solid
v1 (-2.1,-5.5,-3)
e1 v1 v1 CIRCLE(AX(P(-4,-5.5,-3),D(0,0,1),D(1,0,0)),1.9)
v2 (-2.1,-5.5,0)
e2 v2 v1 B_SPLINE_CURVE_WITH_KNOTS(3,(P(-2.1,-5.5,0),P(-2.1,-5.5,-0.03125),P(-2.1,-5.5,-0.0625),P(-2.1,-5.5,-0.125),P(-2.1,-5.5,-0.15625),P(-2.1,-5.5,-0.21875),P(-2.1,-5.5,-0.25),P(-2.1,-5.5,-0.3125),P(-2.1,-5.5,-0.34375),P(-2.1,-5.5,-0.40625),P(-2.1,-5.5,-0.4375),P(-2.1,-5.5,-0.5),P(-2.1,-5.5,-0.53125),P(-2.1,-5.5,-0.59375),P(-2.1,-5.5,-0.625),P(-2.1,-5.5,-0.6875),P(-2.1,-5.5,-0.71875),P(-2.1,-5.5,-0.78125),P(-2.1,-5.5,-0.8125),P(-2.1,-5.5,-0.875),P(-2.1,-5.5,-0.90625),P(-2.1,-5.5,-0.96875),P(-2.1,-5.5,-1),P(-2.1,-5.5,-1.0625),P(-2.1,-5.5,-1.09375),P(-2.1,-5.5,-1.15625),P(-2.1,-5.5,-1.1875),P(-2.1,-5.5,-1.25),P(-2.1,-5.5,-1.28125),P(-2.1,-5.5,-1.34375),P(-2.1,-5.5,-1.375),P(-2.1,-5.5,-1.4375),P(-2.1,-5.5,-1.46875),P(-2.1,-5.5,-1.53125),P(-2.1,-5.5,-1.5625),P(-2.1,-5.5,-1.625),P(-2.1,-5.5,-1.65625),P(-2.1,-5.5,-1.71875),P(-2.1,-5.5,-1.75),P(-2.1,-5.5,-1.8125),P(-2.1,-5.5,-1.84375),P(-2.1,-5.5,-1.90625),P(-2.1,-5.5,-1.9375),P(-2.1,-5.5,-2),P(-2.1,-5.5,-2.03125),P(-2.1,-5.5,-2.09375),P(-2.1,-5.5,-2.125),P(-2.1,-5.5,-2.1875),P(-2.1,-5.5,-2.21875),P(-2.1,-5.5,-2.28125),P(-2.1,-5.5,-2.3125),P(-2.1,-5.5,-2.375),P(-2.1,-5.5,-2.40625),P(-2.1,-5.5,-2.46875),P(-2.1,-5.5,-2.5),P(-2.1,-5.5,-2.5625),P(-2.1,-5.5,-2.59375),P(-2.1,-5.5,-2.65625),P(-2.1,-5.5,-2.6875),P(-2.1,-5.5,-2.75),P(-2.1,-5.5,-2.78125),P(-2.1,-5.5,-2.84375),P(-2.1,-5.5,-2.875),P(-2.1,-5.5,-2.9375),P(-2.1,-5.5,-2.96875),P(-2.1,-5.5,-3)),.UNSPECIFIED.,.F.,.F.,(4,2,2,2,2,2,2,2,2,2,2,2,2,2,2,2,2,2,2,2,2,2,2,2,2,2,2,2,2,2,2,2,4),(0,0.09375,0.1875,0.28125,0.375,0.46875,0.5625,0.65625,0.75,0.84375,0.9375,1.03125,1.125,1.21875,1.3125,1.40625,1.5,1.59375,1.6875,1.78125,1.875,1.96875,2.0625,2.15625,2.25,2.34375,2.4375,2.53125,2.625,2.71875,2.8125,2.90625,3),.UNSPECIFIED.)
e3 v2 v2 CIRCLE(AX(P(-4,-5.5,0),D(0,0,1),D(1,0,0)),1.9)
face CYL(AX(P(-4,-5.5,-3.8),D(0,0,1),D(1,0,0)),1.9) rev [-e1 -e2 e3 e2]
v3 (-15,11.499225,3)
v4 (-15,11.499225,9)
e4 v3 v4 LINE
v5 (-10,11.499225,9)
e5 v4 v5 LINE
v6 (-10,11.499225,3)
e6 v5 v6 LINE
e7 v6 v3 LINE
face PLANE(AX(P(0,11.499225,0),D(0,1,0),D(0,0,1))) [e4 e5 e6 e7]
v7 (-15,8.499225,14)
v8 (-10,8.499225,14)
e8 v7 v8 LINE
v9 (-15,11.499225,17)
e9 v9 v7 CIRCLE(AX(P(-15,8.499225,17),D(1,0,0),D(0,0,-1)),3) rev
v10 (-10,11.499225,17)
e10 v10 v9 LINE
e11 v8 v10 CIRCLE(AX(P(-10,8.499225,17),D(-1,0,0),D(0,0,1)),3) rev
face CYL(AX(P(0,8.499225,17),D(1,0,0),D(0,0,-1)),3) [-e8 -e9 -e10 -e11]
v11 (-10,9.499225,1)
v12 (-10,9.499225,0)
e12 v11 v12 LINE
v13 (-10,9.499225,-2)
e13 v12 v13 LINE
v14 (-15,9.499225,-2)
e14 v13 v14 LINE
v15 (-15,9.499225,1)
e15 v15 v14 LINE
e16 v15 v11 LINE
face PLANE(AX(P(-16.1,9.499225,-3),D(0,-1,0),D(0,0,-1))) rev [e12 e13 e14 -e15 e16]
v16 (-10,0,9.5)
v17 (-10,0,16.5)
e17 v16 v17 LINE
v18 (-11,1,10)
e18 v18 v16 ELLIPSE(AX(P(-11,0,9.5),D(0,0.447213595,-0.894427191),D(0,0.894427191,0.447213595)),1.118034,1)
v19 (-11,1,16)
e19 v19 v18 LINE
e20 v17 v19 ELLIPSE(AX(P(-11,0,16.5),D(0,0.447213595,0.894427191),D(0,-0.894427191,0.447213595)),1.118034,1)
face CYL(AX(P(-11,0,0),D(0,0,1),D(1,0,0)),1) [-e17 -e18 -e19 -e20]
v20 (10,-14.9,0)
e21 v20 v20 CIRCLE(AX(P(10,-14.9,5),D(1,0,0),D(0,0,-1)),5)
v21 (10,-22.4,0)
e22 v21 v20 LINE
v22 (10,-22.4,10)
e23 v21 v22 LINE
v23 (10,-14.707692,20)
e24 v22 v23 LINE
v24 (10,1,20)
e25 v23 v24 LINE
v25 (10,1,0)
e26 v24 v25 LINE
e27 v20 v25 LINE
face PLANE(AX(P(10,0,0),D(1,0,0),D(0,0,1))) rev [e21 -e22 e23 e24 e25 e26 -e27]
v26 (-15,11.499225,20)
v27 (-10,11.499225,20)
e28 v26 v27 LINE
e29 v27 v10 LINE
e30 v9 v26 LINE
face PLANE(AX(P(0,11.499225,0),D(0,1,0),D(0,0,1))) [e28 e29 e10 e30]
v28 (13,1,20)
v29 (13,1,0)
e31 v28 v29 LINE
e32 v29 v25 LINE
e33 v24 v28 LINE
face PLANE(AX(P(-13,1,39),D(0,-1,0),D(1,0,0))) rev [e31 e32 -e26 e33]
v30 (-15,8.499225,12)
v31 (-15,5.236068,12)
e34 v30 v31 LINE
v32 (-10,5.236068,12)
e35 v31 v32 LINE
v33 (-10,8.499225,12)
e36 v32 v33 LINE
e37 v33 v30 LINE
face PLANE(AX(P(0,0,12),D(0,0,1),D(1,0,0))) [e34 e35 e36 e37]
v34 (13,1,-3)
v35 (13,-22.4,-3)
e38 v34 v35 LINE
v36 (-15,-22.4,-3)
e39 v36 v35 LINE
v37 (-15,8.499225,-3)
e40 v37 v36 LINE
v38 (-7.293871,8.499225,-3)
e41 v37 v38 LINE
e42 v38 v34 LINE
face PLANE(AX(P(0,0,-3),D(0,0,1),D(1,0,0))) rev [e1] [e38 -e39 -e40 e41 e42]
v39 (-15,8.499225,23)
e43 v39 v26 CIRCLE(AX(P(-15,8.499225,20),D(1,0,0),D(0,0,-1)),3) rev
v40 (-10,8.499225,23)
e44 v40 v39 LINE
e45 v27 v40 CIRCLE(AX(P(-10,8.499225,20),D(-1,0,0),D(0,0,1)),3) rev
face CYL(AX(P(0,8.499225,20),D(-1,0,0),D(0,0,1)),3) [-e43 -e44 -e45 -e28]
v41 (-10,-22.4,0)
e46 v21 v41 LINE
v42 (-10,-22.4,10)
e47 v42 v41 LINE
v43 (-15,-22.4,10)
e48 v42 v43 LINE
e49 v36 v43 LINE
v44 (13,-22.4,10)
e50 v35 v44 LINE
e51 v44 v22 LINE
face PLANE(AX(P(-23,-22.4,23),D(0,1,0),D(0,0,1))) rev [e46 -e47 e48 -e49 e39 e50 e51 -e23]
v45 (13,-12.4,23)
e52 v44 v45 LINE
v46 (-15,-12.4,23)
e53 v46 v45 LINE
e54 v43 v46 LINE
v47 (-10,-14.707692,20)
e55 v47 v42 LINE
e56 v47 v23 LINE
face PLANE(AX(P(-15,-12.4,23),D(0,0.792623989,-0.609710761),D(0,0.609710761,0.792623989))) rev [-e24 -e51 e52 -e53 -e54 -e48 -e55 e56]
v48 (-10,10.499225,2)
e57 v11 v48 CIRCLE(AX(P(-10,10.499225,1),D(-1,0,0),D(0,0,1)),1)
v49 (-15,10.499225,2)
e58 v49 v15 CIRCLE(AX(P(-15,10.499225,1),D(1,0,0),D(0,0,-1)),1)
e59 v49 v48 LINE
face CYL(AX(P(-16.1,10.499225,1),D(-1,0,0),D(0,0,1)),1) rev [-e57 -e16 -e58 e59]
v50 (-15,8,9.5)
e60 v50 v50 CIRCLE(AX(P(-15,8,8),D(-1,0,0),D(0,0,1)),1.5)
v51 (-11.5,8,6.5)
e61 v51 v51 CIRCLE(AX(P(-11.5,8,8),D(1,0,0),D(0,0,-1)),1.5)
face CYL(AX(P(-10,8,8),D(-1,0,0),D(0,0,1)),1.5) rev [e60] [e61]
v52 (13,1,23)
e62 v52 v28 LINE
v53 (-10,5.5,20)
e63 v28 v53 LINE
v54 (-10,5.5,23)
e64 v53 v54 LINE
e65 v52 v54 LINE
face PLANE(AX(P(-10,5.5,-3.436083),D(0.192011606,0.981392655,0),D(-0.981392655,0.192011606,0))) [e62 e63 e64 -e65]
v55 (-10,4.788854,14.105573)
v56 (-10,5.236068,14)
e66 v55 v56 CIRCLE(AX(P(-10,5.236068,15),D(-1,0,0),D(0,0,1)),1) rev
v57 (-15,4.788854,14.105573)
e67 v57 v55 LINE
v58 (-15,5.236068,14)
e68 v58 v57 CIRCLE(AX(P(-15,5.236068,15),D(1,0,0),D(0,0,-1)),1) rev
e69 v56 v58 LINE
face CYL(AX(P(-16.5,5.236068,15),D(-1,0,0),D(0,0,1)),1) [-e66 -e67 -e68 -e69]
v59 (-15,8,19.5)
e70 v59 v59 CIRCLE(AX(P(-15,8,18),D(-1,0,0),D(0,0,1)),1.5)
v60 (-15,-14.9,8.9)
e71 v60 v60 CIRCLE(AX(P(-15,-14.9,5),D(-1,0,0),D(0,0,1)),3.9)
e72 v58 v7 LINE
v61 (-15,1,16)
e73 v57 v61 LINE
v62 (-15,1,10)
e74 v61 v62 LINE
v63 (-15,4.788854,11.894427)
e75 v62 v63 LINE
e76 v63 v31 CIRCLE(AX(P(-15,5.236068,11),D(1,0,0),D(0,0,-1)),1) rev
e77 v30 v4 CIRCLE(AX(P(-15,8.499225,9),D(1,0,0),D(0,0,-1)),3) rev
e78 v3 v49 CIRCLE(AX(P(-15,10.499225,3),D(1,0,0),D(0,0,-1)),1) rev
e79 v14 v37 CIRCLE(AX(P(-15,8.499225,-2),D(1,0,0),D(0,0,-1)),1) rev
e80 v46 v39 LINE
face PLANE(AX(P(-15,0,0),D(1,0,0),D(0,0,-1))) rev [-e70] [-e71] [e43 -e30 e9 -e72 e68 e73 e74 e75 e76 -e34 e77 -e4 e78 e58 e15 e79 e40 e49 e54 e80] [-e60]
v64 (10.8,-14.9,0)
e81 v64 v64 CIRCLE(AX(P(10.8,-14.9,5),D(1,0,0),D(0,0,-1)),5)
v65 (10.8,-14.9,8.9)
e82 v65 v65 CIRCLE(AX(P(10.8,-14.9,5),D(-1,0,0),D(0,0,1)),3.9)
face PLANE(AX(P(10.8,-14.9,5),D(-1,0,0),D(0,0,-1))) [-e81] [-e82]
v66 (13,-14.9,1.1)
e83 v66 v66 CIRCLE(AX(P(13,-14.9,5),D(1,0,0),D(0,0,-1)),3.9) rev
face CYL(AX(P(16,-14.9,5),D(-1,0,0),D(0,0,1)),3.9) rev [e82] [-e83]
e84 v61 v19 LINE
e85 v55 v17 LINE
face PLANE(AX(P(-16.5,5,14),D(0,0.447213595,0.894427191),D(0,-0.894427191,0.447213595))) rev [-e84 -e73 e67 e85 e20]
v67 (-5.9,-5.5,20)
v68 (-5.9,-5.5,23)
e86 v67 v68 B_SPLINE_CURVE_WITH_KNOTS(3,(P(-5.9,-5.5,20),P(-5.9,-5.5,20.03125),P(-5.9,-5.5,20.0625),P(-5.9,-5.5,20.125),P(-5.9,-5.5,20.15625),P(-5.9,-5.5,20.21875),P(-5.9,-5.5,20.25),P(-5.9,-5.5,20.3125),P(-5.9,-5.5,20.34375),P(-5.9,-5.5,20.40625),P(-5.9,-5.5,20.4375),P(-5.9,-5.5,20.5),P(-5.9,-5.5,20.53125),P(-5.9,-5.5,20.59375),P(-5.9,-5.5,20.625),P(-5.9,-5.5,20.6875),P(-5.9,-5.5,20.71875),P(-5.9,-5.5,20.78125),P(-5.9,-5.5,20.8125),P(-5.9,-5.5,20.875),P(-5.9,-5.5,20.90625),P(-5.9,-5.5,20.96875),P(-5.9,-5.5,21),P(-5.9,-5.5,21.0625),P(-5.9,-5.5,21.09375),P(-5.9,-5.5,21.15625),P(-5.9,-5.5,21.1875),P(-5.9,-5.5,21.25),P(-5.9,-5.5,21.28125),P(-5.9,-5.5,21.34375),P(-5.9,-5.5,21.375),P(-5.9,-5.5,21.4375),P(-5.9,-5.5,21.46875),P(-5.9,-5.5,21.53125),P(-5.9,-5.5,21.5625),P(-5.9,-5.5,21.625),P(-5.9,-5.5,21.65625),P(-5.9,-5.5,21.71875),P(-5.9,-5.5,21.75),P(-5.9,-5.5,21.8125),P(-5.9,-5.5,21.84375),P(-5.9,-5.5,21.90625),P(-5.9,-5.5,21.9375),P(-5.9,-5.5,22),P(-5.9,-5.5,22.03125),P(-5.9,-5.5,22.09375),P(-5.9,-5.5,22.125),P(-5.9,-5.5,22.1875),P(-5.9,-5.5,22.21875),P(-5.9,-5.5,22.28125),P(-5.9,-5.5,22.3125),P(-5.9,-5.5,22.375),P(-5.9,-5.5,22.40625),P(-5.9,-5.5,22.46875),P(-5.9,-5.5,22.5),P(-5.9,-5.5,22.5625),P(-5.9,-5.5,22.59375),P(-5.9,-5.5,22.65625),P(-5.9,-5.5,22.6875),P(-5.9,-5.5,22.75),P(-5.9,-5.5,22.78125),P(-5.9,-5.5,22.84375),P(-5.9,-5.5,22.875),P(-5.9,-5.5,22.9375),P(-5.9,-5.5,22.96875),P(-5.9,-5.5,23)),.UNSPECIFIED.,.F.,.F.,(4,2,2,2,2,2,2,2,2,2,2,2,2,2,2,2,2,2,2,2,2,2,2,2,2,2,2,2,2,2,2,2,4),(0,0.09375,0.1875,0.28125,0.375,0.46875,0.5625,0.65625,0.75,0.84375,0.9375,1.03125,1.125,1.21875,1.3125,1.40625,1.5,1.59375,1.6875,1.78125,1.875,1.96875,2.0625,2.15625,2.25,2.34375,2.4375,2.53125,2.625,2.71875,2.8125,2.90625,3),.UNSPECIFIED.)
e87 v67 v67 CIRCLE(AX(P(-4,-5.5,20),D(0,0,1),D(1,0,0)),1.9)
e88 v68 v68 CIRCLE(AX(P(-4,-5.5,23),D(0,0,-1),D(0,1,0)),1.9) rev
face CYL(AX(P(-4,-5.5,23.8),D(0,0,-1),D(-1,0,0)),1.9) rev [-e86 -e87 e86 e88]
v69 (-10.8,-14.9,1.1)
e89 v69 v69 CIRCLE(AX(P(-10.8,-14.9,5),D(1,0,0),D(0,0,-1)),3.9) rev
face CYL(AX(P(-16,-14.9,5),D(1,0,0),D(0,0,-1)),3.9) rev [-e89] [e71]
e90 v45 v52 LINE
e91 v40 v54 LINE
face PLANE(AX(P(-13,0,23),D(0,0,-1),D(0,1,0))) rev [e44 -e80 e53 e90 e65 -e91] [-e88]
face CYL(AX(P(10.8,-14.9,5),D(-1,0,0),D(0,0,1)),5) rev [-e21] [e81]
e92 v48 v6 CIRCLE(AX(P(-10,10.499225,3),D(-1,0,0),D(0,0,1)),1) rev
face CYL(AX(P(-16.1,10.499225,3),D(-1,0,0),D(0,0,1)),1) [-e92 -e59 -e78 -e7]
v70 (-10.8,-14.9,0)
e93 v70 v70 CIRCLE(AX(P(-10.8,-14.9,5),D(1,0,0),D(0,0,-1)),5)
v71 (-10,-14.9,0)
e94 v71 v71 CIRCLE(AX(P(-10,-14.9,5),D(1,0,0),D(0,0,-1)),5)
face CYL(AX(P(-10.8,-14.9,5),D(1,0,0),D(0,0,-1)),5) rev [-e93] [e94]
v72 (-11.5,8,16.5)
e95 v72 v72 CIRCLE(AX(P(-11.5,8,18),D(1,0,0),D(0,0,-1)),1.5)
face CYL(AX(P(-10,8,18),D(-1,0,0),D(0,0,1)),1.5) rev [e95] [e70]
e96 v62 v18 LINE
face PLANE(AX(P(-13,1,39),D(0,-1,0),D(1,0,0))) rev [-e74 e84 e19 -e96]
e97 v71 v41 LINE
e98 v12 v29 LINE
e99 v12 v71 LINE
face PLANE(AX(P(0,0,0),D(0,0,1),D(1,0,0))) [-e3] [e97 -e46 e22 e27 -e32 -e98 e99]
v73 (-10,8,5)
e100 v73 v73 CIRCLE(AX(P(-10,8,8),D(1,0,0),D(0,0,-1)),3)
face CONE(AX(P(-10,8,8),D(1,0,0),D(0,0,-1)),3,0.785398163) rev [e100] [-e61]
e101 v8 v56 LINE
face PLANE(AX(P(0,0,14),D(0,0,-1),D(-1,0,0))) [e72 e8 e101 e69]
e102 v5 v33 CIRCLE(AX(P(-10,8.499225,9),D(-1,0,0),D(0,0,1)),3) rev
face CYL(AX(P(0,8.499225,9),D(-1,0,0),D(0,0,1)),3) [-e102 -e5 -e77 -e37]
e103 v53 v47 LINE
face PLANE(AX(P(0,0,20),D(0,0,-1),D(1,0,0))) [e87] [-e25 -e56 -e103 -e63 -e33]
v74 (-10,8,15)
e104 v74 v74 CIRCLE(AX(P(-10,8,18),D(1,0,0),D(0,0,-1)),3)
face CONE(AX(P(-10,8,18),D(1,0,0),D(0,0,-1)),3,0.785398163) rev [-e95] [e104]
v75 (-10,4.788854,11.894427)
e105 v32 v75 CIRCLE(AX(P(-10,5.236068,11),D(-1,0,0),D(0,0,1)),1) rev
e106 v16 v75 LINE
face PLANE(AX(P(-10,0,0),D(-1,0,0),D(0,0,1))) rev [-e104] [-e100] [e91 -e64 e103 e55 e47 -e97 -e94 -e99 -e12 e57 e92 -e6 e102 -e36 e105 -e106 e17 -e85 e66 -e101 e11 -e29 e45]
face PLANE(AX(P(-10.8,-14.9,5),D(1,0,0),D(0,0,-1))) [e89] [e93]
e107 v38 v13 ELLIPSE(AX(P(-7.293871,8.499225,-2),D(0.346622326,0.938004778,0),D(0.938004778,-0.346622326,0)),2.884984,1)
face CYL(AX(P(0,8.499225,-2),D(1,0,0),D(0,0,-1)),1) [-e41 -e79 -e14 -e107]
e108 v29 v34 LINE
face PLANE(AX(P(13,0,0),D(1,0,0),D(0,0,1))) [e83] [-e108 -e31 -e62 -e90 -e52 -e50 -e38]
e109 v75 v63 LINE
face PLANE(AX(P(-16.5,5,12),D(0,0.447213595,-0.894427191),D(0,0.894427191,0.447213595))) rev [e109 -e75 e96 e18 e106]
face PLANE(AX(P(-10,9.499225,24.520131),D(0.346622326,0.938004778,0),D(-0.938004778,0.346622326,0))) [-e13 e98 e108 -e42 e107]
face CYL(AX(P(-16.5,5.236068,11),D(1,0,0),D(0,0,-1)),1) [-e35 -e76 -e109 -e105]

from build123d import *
from build123d.topology import SkipClean

# Parameters (mm, degrees)
SKETCH_1_W                = 20
SKETCH_1_H                = 57.76596942167697
EXTRUDE_1_DEPTH           = 3
EXTRUDE_2_DEPTH           = 3
CUT_EXTRUDE_1_DEPTH       = 6
SKETCH_8_R                = 4.48
CUT_EXTRUDE_2_DEPTH       = 0.8
SKETCH_9_R                = 1.9
CUT_EXTRUDE_3_DEPTH       = 3.8
SKETCH_12_W               = 26.000000000000007
SKETCH_12_H               = 35.36596942167698
CUT_EXTRUDE_4_DEPTH       = 36.00000000000001
CUT_EXTRUDE_8_DEPTH       = 28.00000000000001
SKETCH_23_W               = 26.000000000000004
SKETCH_23_H               = 26
SKETCH_23_W_2             = 20
SKETCH_23_H_2             = 19.999999999999993
EXTRUDE_7_DEPTH           = 4
SKETCH_24_W               = 20
SKETCH_24_H               = 19.999999999999993
EXTRUDE_8_DEPTH           = 3
SKETCH_25_W               = 5.000000000000002
SKETCH_25_H               = 16
SKETCH_25_R               = 1.4999999999999991
EXTRUDE_9_DEPTH           = 3
FILLET_1_R                = 1
CUT_EXTRUDE_9_DEPTH       = 3
SKETCH_27_R               = 1.4999999999999987
CUT_EXTRUDE_10_DEPTH      = 3
SKETCH_28_W               = 20
SKETCH_28_H               = 19.999999999999993
CUT_EXTRUDE_11_DEPTH      = 10
CUT_EXTRUDE_12_DEPTH      = 42.00000000000001
SKETCH_31_R               = 4.48
SKETCH_31_R_2             = 3.98
EXTRUDE_13_DEPTH          = 0.8
SKETCH_32_R               = 5.000000000000001
SKETCH_32_R_2             = 3.98
CUT_EXTRUDE_13_DEPTH      = 0.8
SKETCH_33_R               = 4.48
EXTRUDE_14_DEPTH          = 3
SKETCH_36_R               = 5.000000000000001
CUT_EXTRUDE_14_DEPTH      = 3
SKETCH_37_R               = 3.98
SKETCH_37_R_2             = 3.900000000000001
EXTRUDE_17_DEPTH          = 0.8
SKETCH_38_R               = 1.5000000000000009
EXTRUDE_18_DEPTH          = 3
SKETCH_39_W               = 4.187599959799879
SKETCH_39_H               = 1.3608825238343043
EXTRUDE_19_DEPTH          = 3
EXTRUDE_START             = 2
SKETCH_43_R               = 1.5000000000000024
SKETCH_43_R_2             = 1.5000000000000009
SKETCH_43_R_3             = 3.900000000000002
EXTRUDE_22_DEPTH          = 2
SKETCH_44_W               = 5
SKETCH_44_H               = 9.399224841629362
EXTRUDE_23_DEPTH          = 2
EXTRUDE_24_DEPTH          = 3
SKETCH_47_W               = 5
SKETCH_47_H               = 9.399224841629362
EXTRUDE_25_DEPTH          = 8
SKETCH_51_W               = 5
SKETCH_51_H               = 14
SKETCH_51_H_2             = 7.999999999999998
EXTRUDE_28_DEPTH          = 1.1
CUT_EXTRUDE_16_DEPTH      = 6.1000000000000005
FILLET_START              = -16
FILLET_9_DEPTH            = 7
FILLET_START_2            = -15
FILLET_9_2_DEPTH          = 5
EXTRUDE_30_DEPTH          = 3
FILLET_10_R               = 1
SKETCH_57_W               = 5
SKETCH_57_H               = 10.499224841629362
EXTRUDE_31_DEPTH          = 1
SKETCH_58_W               = 5
SKETCH_58_H               = 10.499224841629362
EXTRUDE_32_DEPTH          = 1
FILLET_11_R               = 3
CUT_EXTRUDE_19_DEPTH      = 6.500000000000001
FILLET_14_R               = 1
FILLET_19_R               = 1
HOLE_WIZARD_1_D           = 3
HOLE_WIZARD_1_DEPTH       = 5
HOLE_WIZARD_1_CSINK_D     = 6
HOLE_WIZARD_1_CSINK_ANGLE = 90


with BuildPart() as part:
    # 草图1 → 凸台-拉伸1 (new body)
    with BuildSketch(Plane.XY):
        with Locations((0, -28.882984710838485)):
            Rectangle(SKETCH_1_W, SKETCH_1_H)
    extrude_1 = extrude(amount=-EXTRUDE_1_DEPTH)

    # 草图2 → 凸台-拉伸2 (add)
    with BuildSketch(Plane.ZY.offset(10)):
        Polygon((-3, -1.22e-15), (23, 0), (23.000000000000007, -57.76596942167697), (-3, -57.76596942167697), align=None)
    extrude_2 = extrude(amount=EXTRUDE_2_DEPTH)

    # 草图7 → 切除-拉伸1 (cut)
    with BuildSketch(Plane(origin=(-10, 0, 0), x_dir=(0, 0, -1), z_dir=(1, 0, 0))):
        with BuildLine():
            ThreePointArc((-1.0999999999999996, -14.899999999999997), (-5, -10.999999999999996), (-8.9, -14.899999999999997))
            Line((-8.9, -14.899999999999997), (-1.1000000000000014, -14.899999999999997))
        make_face()
        with BuildLine():
            Line((-1.1000000000000014, -14.899999999999997), (-8.9, -14.899999999999997))
            ThreePointArc((-8.9, -14.899999999999997), (-5.000000000000001, -18.799999999999997), (-1.0999999999999996, -14.899999999999999))
        make_face()
    cut_extrude_1 = extrude(amount=-CUT_EXTRUDE_1_DEPTH, mode=Mode.SUBTRACT)

    # 草图8 → 切除-拉伸2 (cut)
    with BuildSketch(Plane.ZY.offset(13.000000000000002)):
        with Locations((5, -14.899999999999997)):
            Circle(SKETCH_8_R)
    cut_extrude_2 = extrude(amount=-CUT_EXTRUDE_2_DEPTH, mode=Mode.SUBTRACT)

    # 草图9 → 切除-拉伸3 (cut)
    with BuildSketch(Plane.XY):
        with Locations((-4, -5.499999999999998)):
            Circle(SKETCH_9_R)
    cut_extrude_3 = extrude(amount=-CUT_EXTRUDE_3_DEPTH, mode=Mode.SUBTRACT)

    # 镜向1: 凸台-拉伸2 across plane
    add(extrude_2.mirror(Plane(origin=(0, 0, 0), x_dir=(0, 0, 1), z_dir=(1, 0, 0))))

    # 镜向2: 切除-拉伸1, 切除-拉伸2 across plane
    add(cut_extrude_1.mirror(Plane(origin=(0, 0, 0), x_dir=(0, 0, 1), z_dir=(1, 0, 0))), mode=Mode.SUBTRACT)
    add(cut_extrude_2.mirror(Plane(origin=(0, 0, 0), x_dir=(0, 0, 1), z_dir=(1, 0, 0))), mode=Mode.SUBTRACT)

    # 镜向3: 凸台-拉伸1 across plane
    add(extrude_1.mirror(Plane.XY.offset(10)))

    # 镜向5: 切除-拉伸3 across plane
    add(cut_extrude_3.mirror(Plane.XY.offset(10)), mode=Mode.SUBTRACT)

    # 草图12 → 切除-拉伸4 (cut)
    with BuildSketch(Plane(origin=(13.000000000000002, 0, 0), x_dir=(0, 0, -1), z_dir=(1, 0, 0))):
        with Locations((-10.000000000000004, -40.08298471083848)):
            Rectangle(SKETCH_12_W, SKETCH_12_H)
    extrude(amount=-CUT_EXTRUDE_4_DEPTH, mode=Mode.SUBTRACT)

    # 草图22 → 切除-拉伸8 (cut)
    with BuildSketch(Plane(origin=(13.000000000000002, 0, 0), x_dir=(0, 0, -1), z_dir=(1, 0, 0))):
        Polygon((-23.000000000000007, -12.399999999999997), (-23.000000000000007, -22.399999999999995), (-10.000000000000007, -22.399999999999995), align=None)
    extrude(amount=-CUT_EXTRUDE_8_DEPTH, mode=Mode.SUBTRACT)

    # 草图23 → 凸台-拉伸7 (add)
    with BuildSketch(Plane(origin=(0, 0, 0), x_dir=(1, 0, 0), z_dir=(0, 1, 0))):
        with Locations((0, -10)):
            Rectangle(SKETCH_23_W, SKETCH_23_H)
        with Locations((0, -9.999999999999996)):
            Rectangle(SKETCH_23_W_2, SKETCH_23_H_2, mode=Mode.SUBTRACT)
    extrude(amount=EXTRUDE_7_DEPTH)

    # 草图24 → 凸台-拉伸8 (add)
    with BuildSketch(Plane(origin=(0, 4, 0), x_dir=(1, 0, 0), z_dir=(0, 1, 0))):
        with Locations((0, -9.999999999999996)):
            Rectangle(SKETCH_24_W, SKETCH_24_H)
    extrude(amount=-EXTRUDE_8_DEPTH)

    # 草图25 → 凸台-拉伸9 (add)
    with BuildSketch(Plane(origin=(0, 4, 0), x_dir=(1, 0, 0), z_dir=(0, 1, 0))):
        with Locations((15.500000000000004, -15)):
            Rectangle(SKETCH_25_W, SKETCH_25_H)
        with Locations(Location((15.500000000000002, -20.23329325648959, 0), (0, 0, 270))):
            Circle(SKETCH_25_R, mode=Mode.SUBTRACT)
        with Locations(Location((15.500000000000002, -10.23329325648959, 0), (0, 0, 270))):
            Circle(SKETCH_25_R, mode=Mode.SUBTRACT)
    extrude(amount=-EXTRUDE_9_DEPTH)

    # 圆角1
    fillet_1_edges = [part.edges().sort_by_distance(p)[0] for p in [
        (18.000000000000004, 1, 15),
    ]]
    fillet(fillet_1_edges, radius=FILLET_1_R)

    # 草图26 → 切除-拉伸9 (cut)
    with BuildSketch(Plane(origin=(13.000000000000002, 0, 0), x_dir=(0, 0, -1), z_dir=(1, 0, 0))):
        with BuildLine():
            Line((-16, 1.0000000000000004), (-13.999999999999998, 1.0000000000000004))
            ThreePointArc((-13.999999999999998, 1.0000000000000004), (-15, 0), (-16, 1.0000000000000004))
        make_face()
    extrude(amount=-CUT_EXTRUDE_9_DEPTH, mode=Mode.SUBTRACT)

    # 草图27 → 切除-拉伸10 (cut)
    with BuildSketch(Plane(origin=(0, 4, 0), x_dir=(1, 0, 0), z_dir=(0, 1, 0))):
        with Locations(Location((7.500000000000002, -15.233293256489592, 0), (0, 0, 270))):
            Circle(SKETCH_27_R)
    extrude(amount=-CUT_EXTRUDE_10_DEPTH, mode=Mode.SUBTRACT)

    # 草图28 → 切除-拉伸11 (cut)
    with BuildSketch(Plane.XZ.offset(-1)):
        with Locations((0, 9.999999999999996)):
            Rectangle(SKETCH_28_W, SKETCH_28_H)
    extrude(amount=-CUT_EXTRUDE_11_DEPTH, mode=Mode.SUBTRACT)

    # 草图29 → 切除-拉伸12 (cut)
    with BuildSketch(Plane(origin=(0, 0, -3), x_dir=(-1, 0, 0), z_dir=(0, 0, -1))):
        Polygon((13.000000000000002, 4), (-24.68163228941081, 4), (-24.68163228941081, 0.9999999999999957), (13.000000000000002, 1.0000000000000002), align=None)
    extrude(amount=-CUT_EXTRUDE_12_DEPTH, mode=Mode.SUBTRACT)

    # 草图31 → 凸台-拉伸13 (add)
    with BuildSketch(Plane.ZY.offset(12.200000000000001)):
        with Locations((5, -14.899999999999997)):
            Circle(SKETCH_31_R)
        with Locations((5, -14.899999999999997)):
            Circle(SKETCH_31_R_2, mode=Mode.SUBTRACT)
    extrude(amount=EXTRUDE_13_DEPTH)

    # 草图32 → 切除-拉伸13 (cut)
    with BuildSketch(Plane(origin=(-10, 0, 0), x_dir=(0, 0, -1), z_dir=(1, 0, 0))):
        with Locations((-5, -14.899999999999997)):
            Circle(SKETCH_32_R)
        with Locations(Location((-5, -14.899999999999997, 0), (0, 0, 180))):
            Circle(SKETCH_32_R_2, mode=Mode.SUBTRACT)
    cut_extrude_13 = extrude(amount=-CUT_EXTRUDE_13_DEPTH, mode=Mode.SUBTRACT)

    # 草图33 → 凸台-拉伸14 (add)
    with BuildSketch(Plane(origin=(13.000000000000002, 0, 0), x_dir=(0, 0, -1), z_dir=(1, 0, 0))):
        with Locations((-5, -14.899999999999997)):
            Circle(SKETCH_33_R)
    extrude(amount=-EXTRUDE_14_DEPTH)

    # 镜向6: 切除-拉伸1, 切除-拉伸13 across plane
    add(cut_extrude_1.mirror(Plane(origin=(0, 0, 0), x_dir=(0, 0, 1), z_dir=(1, 0, 0))), mode=Mode.SUBTRACT)
    add(cut_extrude_13.mirror(Plane(origin=(0, 0, 0), x_dir=(0, 0, 1), z_dir=(1, 0, 0))), mode=Mode.SUBTRACT)

    # 草图36 → 切除-拉伸14 (cut)
    with BuildSketch(Plane(origin=(-10.8, 0, 0), x_dir=(0, 0, -1), z_dir=(1, 0, 0))):
        with Locations((-5, -14.899999999999997)):
            Circle(SKETCH_36_R)
    cut_extrude_14 = extrude(amount=CUT_EXTRUDE_14_DEPTH, mode=Mode.SUBTRACT)

    # 镜向7: 切除-拉伸14 across plane
    add(cut_extrude_14.mirror(Plane(origin=(0, 0, 0), x_dir=(0, 0, 1), z_dir=(1, 0, 0))), mode=Mode.SUBTRACT)

    # 草图37 → 凸台-拉伸17 (add)
    with SkipClean():  # the faces are left unmerged after this step: merging them gives an invalid solid
        with BuildSketch(Plane.ZY.offset(12.200000000000001)):
            with Locations((5, -14.899999999999997)):
                Circle(SKETCH_37_R)
            with Locations((5, -14.899999999999997)):
                Circle(SKETCH_37_R_2, mode=Mode.SUBTRACT)
        extrude(amount=EXTRUDE_17_DEPTH)

    # 草图38 → 凸台-拉伸18 (add)
    # profile 1 of 2: a face of its own
    with SkipClean():  # the faces are left unmerged after this step: merging them gives an invalid solid
        with BuildSketch(Plane.ZY.offset(13.000000000000002)):
            Polygon((15, 10.399224841629362), (15, 1), (20.999999999999996, 1.0000000000000002), (20.999999999999996, 10.399224841629362), align=None)
            with Locations((18, 8)):
                Circle(SKETCH_38_R, mode=Mode.SUBTRACT)
        # profile 2 of 2: a face of its own
        with BuildSketch(Plane.ZY.offset(13.000000000000002)):
            Polygon((11, 1), (11, 10.399224841629362), (5.000000000000001, 10.399224841629362), (5.000000000000001, 1.0000000000000002), align=None)
            with Locations((8, 8)):
                Circle(SKETCH_38_R, mode=Mode.SUBTRACT)
        extrude(amount=-EXTRUDE_18_DEPTH)

    # 草图39 → 凸台-拉伸19 (add)
    with SkipClean():  # the faces are left unmerged after this step: merging them gives an invalid solid
        with BuildSketch(Plane(origin=(13.000000000000002, 0, 0), x_dir=(0, 0, -1), z_dir=(1, 0, 0))):
            with Locations((-15.28799119011226, 0.3195587380828476)):
                Rectangle(SKETCH_39_W, SKETCH_39_H)
        extrude(amount=-EXTRUDE_19_DEPTH)

    # 草图43 → 凸台-拉伸22 (add)
    with BuildSketch(Plane.ZY.offset(13.000000000000002).offset(EXTRUDE_START)):
        Polygon((-3, 1.0000000000000002), (5.000000000000004, 1.0000000000000002), (5.000000000000001, 10.399224841629362), (11, 10.399224841629362), (11, 1.0000000000000002), (15, 1.0000000000000002), (15, 10.399224841629362), (20.999999999999996, 10.399224841629362), (20.999999999999996, 1.0000000000000002), (23.000000000000007, 1.0000000000000002), (23.000000000000007, -12.399999999999997), (10.000000000000009, -22.399999999999995), (-3, -22.399999999999995), align=None)
        with Locations((8, 8)):
            Circle(SKETCH_43_R, mode=Mode.SUBTRACT)
        with Locations((18, 8)):
            Circle(SKETCH_43_R_2, mode=Mode.SUBTRACT)
        with Locations((5, -14.899999999999997)):
            Circle(SKETCH_43_R_3, mode=Mode.SUBTRACT)
    extrude(amount=-EXTRUDE_22_DEPTH)

    # 草图44 → 凸台-拉伸23 (add)
    with BuildSketch(Plane.XY.offset(20.999999999999996)):
        with Locations((-12.500000000000002, 5.699612420814681)):
            Rectangle(SKETCH_44_W, SKETCH_44_H)
    extrude(amount=EXTRUDE_23_DEPTH)

    # 草图45 → 凸台-拉伸24 (add)
    with BuildSketch(Plane.XY.offset(23)):
        Polygon((-10.000000000000002, 0.9999999999999981), (13.000000000000002, 0.9999999999999943), (-10.000000000000002, 5.499999999999998), align=None)
    extrude(amount=-EXTRUDE_24_DEPTH)

    # 草图47 → 凸台-拉伸25 (add)
    with BuildSketch(Plane(origin=(0, 0, 5.000000000000001), x_dir=(-1, 0, 0), z_dir=(0, 0, -1))):
        with Locations((12.500000000000002, 5.699612420814681)):
            Rectangle(SKETCH_47_W, SKETCH_47_H)
    extrude(amount=EXTRUDE_25_DEPTH)

    # 草图51 → 凸台-拉伸28 (add)
    with BuildSketch(Plane(origin=(0, 10.399224841629362, 0), x_dir=(1, 0, 0), z_dir=(0, 1, 0))):
        with Locations((-12.500000000000002, -4)):
            Rectangle(SKETCH_51_W, SKETCH_51_H)
        with Locations((-12.500000000000002, -19)):
            Rectangle(SKETCH_51_W, SKETCH_51_H_2)
    extrude(amount=EXTRUDE_28_DEPTH)

    # 草图53 → 切除-拉伸16 (cut)
    with BuildSketch(Plane(origin=(-10, 0, 0), x_dir=(0, 0, -1), z_dir=(1, 0, 0))):
        Polygon((2.999999999999999, 11.499224841629362), (-2.000000000000001, 11.499224841629362), (-2.0000000000000004, 9.49922484162936), (2.999999999999999, 9.499224841629362), align=None)
    extrude(amount=-CUT_EXTRUDE_16_DEPTH, mode=Mode.SUBTRACT)

    # 圆角9: read off the stored shape, not the designer's step
    # 圆角9 outline → 圆角9 (cut)
    with BuildSketch(Plane.YZ.offset(FILLET_START)):
        with BuildLine():
            Line((11.499224842, 2), (11.499224842, 3))
            ThreePointArc((11.499224842, 3), (11.206331623, 2.292893219), (10.499224842, 2))
            Line((10.499224842, 2), (11.499224842, 2))
        make_face()
    extrude(amount=FILLET_9_DEPTH, mode=Mode.SUBTRACT)

    # Fillet 9 2 outline → Fillet 9 2 (add)
    with BuildSketch(Plane.YZ.offset(FILLET_START_2)):
        with BuildLine():
            ThreePointArc((9.499224842, 1), (9.79211806, 1.707106782), (10.499224842, 2))
            Line((10.499224842, 2), (9.499224842, 2))
            Line((9.499224842, 2), (9.499224842, 1))
        make_face()
    extrude(amount=FILLET_9_2_DEPTH)

    # 草图54 → 凸台-拉伸30 (add)
    with BuildSketch(Plane(origin=(0, 0, -3), x_dir=(-1, 0, 0), z_dir=(0, 0, -1))):
        Polygon((-13.000000000000002, 0.9999999999999972), (10.000000000000002, 1.0000000000000002), (10, 9.499224841629362), align=None)
    extrude(amount=-EXTRUDE_30_DEPTH)

    # 圆角10
    fillet_10_edges = [part.edges().sort_by_distance(p)[0] for p in [
        (-12.5, 9.499224841629362, -2.999999999999999),
    ]]
    fillet(fillet_10_edges, radius=FILLET_10_R)

    # 草图57 → 凸台-拉伸31 (add)
    with BuildSketch(Plane(origin=(0, 0, 15), x_dir=(-1, 0, 0), z_dir=(0, 0, -1))):
        with Locations((12.500000000000002, 6.249612420814681)):
            Rectangle(SKETCH_57_W, SKETCH_57_H)
    extrude(amount=EXTRUDE_31_DEPTH)

    # 草图58 → 凸台-拉伸32 (add)
    with BuildSketch(Plane.XY.offset(11)):
        with Locations((-12.500000000000002, 6.249612420814681)):
            Rectangle(SKETCH_58_W, SKETCH_58_H)
    extrude(amount=EXTRUDE_32_DEPTH)

    # 圆角11
    # the kernel refuses this fillet: 3 mm, written as the material it takes off along each edge
    with BuildSketch(Plane(origin=(-2.5000000000000018, 11.499224841629362, 23), x_dir=(0, -1, 0), z_dir=(-1, 0, 0)), Plane(origin=(-2.5000000000000018, 11.499224841629362, 14), x_dir=(0, 0, 1), z_dir=(-1, 0, 0))) as fillet_11_piece_1:
        with BuildLine():
            CenterArc((FILLET_11_R, -FILLET_11_R), FILLET_11_R, 90, 90)
            Line((0, -FILLET_11_R), (0, 0))
            Line((0, 0), (FILLET_11_R, 0))
        make_face()
    extrude(amount=20, mode=Mode.SUBTRACT)
    with BuildSketch(Plane(origin=(-22.5, 11.499224841629362, 12), x_dir=(0, -1, 0), z_dir=(1, 0, 0))) as fillet_11_piece_2:
        with BuildLine():
            CenterArc((FILLET_11_R, FILLET_11_R), FILLET_11_R, 180, 90)
            Line((0, FILLET_11_R), (0, 0))
            Line((0, 0), (FILLET_11_R, 0))
        make_face()
    extrude(amount=20, mode=Mode.SUBTRACT)

    # 草图61 → 切除-拉伸19 (cut)
    with BuildSketch(Plane(origin=(-10, 0, 0), x_dir=(0, 0, -1), z_dir=(1, 0, 0))):
        Polygon((-12, 1.0000000000000002), (-12, 5), (-10, 1.0000000000000007), align=None)
        Polygon((-13.999999999999998, 1.0000000000000002), (-13.999999999999998, 5), (-16, 0.9999999999999998), align=None)
    extrude(amount=-CUT_EXTRUDE_19_DEPTH, mode=Mode.SUBTRACT)

    # 圆角14
    fillet_14_edges = [part.edges().sort_by_distance(p)[0] for p in [
        (-10, 1.0000000000000002, 13),
    ]]
    fillet(fillet_14_edges, radius=FILLET_14_R)

    # 圆角19
    fillet_19_edges = [part.edges().sort_by_distance(p)[0] for p in [
        (-12.5, 5, 12),
        (-12.5, 5, 13.999999999999998),
    ]]
    fillet(fillet_19_edges, radius=FILLET_19_R)

    # 打孔尺寸(%根据)内六角花形沉头螺钉的类型1
    with Locations(Plane(origin=(-10, 8, 18), x_dir=(0, 0, 1), z_dir=(1, 0, 0))):
        with Locations((0, 0), (-10, 0)):
            CounterSinkHole(HOLE_WIZARD_1_D / 2, HOLE_WIZARD_1_CSINK_D / 2, depth=HOLE_WIZARD_1_DEPTH, counter_sink_angle=HOLE_WIZARD_1_CSINK_ANGLE)


solid = part.part
